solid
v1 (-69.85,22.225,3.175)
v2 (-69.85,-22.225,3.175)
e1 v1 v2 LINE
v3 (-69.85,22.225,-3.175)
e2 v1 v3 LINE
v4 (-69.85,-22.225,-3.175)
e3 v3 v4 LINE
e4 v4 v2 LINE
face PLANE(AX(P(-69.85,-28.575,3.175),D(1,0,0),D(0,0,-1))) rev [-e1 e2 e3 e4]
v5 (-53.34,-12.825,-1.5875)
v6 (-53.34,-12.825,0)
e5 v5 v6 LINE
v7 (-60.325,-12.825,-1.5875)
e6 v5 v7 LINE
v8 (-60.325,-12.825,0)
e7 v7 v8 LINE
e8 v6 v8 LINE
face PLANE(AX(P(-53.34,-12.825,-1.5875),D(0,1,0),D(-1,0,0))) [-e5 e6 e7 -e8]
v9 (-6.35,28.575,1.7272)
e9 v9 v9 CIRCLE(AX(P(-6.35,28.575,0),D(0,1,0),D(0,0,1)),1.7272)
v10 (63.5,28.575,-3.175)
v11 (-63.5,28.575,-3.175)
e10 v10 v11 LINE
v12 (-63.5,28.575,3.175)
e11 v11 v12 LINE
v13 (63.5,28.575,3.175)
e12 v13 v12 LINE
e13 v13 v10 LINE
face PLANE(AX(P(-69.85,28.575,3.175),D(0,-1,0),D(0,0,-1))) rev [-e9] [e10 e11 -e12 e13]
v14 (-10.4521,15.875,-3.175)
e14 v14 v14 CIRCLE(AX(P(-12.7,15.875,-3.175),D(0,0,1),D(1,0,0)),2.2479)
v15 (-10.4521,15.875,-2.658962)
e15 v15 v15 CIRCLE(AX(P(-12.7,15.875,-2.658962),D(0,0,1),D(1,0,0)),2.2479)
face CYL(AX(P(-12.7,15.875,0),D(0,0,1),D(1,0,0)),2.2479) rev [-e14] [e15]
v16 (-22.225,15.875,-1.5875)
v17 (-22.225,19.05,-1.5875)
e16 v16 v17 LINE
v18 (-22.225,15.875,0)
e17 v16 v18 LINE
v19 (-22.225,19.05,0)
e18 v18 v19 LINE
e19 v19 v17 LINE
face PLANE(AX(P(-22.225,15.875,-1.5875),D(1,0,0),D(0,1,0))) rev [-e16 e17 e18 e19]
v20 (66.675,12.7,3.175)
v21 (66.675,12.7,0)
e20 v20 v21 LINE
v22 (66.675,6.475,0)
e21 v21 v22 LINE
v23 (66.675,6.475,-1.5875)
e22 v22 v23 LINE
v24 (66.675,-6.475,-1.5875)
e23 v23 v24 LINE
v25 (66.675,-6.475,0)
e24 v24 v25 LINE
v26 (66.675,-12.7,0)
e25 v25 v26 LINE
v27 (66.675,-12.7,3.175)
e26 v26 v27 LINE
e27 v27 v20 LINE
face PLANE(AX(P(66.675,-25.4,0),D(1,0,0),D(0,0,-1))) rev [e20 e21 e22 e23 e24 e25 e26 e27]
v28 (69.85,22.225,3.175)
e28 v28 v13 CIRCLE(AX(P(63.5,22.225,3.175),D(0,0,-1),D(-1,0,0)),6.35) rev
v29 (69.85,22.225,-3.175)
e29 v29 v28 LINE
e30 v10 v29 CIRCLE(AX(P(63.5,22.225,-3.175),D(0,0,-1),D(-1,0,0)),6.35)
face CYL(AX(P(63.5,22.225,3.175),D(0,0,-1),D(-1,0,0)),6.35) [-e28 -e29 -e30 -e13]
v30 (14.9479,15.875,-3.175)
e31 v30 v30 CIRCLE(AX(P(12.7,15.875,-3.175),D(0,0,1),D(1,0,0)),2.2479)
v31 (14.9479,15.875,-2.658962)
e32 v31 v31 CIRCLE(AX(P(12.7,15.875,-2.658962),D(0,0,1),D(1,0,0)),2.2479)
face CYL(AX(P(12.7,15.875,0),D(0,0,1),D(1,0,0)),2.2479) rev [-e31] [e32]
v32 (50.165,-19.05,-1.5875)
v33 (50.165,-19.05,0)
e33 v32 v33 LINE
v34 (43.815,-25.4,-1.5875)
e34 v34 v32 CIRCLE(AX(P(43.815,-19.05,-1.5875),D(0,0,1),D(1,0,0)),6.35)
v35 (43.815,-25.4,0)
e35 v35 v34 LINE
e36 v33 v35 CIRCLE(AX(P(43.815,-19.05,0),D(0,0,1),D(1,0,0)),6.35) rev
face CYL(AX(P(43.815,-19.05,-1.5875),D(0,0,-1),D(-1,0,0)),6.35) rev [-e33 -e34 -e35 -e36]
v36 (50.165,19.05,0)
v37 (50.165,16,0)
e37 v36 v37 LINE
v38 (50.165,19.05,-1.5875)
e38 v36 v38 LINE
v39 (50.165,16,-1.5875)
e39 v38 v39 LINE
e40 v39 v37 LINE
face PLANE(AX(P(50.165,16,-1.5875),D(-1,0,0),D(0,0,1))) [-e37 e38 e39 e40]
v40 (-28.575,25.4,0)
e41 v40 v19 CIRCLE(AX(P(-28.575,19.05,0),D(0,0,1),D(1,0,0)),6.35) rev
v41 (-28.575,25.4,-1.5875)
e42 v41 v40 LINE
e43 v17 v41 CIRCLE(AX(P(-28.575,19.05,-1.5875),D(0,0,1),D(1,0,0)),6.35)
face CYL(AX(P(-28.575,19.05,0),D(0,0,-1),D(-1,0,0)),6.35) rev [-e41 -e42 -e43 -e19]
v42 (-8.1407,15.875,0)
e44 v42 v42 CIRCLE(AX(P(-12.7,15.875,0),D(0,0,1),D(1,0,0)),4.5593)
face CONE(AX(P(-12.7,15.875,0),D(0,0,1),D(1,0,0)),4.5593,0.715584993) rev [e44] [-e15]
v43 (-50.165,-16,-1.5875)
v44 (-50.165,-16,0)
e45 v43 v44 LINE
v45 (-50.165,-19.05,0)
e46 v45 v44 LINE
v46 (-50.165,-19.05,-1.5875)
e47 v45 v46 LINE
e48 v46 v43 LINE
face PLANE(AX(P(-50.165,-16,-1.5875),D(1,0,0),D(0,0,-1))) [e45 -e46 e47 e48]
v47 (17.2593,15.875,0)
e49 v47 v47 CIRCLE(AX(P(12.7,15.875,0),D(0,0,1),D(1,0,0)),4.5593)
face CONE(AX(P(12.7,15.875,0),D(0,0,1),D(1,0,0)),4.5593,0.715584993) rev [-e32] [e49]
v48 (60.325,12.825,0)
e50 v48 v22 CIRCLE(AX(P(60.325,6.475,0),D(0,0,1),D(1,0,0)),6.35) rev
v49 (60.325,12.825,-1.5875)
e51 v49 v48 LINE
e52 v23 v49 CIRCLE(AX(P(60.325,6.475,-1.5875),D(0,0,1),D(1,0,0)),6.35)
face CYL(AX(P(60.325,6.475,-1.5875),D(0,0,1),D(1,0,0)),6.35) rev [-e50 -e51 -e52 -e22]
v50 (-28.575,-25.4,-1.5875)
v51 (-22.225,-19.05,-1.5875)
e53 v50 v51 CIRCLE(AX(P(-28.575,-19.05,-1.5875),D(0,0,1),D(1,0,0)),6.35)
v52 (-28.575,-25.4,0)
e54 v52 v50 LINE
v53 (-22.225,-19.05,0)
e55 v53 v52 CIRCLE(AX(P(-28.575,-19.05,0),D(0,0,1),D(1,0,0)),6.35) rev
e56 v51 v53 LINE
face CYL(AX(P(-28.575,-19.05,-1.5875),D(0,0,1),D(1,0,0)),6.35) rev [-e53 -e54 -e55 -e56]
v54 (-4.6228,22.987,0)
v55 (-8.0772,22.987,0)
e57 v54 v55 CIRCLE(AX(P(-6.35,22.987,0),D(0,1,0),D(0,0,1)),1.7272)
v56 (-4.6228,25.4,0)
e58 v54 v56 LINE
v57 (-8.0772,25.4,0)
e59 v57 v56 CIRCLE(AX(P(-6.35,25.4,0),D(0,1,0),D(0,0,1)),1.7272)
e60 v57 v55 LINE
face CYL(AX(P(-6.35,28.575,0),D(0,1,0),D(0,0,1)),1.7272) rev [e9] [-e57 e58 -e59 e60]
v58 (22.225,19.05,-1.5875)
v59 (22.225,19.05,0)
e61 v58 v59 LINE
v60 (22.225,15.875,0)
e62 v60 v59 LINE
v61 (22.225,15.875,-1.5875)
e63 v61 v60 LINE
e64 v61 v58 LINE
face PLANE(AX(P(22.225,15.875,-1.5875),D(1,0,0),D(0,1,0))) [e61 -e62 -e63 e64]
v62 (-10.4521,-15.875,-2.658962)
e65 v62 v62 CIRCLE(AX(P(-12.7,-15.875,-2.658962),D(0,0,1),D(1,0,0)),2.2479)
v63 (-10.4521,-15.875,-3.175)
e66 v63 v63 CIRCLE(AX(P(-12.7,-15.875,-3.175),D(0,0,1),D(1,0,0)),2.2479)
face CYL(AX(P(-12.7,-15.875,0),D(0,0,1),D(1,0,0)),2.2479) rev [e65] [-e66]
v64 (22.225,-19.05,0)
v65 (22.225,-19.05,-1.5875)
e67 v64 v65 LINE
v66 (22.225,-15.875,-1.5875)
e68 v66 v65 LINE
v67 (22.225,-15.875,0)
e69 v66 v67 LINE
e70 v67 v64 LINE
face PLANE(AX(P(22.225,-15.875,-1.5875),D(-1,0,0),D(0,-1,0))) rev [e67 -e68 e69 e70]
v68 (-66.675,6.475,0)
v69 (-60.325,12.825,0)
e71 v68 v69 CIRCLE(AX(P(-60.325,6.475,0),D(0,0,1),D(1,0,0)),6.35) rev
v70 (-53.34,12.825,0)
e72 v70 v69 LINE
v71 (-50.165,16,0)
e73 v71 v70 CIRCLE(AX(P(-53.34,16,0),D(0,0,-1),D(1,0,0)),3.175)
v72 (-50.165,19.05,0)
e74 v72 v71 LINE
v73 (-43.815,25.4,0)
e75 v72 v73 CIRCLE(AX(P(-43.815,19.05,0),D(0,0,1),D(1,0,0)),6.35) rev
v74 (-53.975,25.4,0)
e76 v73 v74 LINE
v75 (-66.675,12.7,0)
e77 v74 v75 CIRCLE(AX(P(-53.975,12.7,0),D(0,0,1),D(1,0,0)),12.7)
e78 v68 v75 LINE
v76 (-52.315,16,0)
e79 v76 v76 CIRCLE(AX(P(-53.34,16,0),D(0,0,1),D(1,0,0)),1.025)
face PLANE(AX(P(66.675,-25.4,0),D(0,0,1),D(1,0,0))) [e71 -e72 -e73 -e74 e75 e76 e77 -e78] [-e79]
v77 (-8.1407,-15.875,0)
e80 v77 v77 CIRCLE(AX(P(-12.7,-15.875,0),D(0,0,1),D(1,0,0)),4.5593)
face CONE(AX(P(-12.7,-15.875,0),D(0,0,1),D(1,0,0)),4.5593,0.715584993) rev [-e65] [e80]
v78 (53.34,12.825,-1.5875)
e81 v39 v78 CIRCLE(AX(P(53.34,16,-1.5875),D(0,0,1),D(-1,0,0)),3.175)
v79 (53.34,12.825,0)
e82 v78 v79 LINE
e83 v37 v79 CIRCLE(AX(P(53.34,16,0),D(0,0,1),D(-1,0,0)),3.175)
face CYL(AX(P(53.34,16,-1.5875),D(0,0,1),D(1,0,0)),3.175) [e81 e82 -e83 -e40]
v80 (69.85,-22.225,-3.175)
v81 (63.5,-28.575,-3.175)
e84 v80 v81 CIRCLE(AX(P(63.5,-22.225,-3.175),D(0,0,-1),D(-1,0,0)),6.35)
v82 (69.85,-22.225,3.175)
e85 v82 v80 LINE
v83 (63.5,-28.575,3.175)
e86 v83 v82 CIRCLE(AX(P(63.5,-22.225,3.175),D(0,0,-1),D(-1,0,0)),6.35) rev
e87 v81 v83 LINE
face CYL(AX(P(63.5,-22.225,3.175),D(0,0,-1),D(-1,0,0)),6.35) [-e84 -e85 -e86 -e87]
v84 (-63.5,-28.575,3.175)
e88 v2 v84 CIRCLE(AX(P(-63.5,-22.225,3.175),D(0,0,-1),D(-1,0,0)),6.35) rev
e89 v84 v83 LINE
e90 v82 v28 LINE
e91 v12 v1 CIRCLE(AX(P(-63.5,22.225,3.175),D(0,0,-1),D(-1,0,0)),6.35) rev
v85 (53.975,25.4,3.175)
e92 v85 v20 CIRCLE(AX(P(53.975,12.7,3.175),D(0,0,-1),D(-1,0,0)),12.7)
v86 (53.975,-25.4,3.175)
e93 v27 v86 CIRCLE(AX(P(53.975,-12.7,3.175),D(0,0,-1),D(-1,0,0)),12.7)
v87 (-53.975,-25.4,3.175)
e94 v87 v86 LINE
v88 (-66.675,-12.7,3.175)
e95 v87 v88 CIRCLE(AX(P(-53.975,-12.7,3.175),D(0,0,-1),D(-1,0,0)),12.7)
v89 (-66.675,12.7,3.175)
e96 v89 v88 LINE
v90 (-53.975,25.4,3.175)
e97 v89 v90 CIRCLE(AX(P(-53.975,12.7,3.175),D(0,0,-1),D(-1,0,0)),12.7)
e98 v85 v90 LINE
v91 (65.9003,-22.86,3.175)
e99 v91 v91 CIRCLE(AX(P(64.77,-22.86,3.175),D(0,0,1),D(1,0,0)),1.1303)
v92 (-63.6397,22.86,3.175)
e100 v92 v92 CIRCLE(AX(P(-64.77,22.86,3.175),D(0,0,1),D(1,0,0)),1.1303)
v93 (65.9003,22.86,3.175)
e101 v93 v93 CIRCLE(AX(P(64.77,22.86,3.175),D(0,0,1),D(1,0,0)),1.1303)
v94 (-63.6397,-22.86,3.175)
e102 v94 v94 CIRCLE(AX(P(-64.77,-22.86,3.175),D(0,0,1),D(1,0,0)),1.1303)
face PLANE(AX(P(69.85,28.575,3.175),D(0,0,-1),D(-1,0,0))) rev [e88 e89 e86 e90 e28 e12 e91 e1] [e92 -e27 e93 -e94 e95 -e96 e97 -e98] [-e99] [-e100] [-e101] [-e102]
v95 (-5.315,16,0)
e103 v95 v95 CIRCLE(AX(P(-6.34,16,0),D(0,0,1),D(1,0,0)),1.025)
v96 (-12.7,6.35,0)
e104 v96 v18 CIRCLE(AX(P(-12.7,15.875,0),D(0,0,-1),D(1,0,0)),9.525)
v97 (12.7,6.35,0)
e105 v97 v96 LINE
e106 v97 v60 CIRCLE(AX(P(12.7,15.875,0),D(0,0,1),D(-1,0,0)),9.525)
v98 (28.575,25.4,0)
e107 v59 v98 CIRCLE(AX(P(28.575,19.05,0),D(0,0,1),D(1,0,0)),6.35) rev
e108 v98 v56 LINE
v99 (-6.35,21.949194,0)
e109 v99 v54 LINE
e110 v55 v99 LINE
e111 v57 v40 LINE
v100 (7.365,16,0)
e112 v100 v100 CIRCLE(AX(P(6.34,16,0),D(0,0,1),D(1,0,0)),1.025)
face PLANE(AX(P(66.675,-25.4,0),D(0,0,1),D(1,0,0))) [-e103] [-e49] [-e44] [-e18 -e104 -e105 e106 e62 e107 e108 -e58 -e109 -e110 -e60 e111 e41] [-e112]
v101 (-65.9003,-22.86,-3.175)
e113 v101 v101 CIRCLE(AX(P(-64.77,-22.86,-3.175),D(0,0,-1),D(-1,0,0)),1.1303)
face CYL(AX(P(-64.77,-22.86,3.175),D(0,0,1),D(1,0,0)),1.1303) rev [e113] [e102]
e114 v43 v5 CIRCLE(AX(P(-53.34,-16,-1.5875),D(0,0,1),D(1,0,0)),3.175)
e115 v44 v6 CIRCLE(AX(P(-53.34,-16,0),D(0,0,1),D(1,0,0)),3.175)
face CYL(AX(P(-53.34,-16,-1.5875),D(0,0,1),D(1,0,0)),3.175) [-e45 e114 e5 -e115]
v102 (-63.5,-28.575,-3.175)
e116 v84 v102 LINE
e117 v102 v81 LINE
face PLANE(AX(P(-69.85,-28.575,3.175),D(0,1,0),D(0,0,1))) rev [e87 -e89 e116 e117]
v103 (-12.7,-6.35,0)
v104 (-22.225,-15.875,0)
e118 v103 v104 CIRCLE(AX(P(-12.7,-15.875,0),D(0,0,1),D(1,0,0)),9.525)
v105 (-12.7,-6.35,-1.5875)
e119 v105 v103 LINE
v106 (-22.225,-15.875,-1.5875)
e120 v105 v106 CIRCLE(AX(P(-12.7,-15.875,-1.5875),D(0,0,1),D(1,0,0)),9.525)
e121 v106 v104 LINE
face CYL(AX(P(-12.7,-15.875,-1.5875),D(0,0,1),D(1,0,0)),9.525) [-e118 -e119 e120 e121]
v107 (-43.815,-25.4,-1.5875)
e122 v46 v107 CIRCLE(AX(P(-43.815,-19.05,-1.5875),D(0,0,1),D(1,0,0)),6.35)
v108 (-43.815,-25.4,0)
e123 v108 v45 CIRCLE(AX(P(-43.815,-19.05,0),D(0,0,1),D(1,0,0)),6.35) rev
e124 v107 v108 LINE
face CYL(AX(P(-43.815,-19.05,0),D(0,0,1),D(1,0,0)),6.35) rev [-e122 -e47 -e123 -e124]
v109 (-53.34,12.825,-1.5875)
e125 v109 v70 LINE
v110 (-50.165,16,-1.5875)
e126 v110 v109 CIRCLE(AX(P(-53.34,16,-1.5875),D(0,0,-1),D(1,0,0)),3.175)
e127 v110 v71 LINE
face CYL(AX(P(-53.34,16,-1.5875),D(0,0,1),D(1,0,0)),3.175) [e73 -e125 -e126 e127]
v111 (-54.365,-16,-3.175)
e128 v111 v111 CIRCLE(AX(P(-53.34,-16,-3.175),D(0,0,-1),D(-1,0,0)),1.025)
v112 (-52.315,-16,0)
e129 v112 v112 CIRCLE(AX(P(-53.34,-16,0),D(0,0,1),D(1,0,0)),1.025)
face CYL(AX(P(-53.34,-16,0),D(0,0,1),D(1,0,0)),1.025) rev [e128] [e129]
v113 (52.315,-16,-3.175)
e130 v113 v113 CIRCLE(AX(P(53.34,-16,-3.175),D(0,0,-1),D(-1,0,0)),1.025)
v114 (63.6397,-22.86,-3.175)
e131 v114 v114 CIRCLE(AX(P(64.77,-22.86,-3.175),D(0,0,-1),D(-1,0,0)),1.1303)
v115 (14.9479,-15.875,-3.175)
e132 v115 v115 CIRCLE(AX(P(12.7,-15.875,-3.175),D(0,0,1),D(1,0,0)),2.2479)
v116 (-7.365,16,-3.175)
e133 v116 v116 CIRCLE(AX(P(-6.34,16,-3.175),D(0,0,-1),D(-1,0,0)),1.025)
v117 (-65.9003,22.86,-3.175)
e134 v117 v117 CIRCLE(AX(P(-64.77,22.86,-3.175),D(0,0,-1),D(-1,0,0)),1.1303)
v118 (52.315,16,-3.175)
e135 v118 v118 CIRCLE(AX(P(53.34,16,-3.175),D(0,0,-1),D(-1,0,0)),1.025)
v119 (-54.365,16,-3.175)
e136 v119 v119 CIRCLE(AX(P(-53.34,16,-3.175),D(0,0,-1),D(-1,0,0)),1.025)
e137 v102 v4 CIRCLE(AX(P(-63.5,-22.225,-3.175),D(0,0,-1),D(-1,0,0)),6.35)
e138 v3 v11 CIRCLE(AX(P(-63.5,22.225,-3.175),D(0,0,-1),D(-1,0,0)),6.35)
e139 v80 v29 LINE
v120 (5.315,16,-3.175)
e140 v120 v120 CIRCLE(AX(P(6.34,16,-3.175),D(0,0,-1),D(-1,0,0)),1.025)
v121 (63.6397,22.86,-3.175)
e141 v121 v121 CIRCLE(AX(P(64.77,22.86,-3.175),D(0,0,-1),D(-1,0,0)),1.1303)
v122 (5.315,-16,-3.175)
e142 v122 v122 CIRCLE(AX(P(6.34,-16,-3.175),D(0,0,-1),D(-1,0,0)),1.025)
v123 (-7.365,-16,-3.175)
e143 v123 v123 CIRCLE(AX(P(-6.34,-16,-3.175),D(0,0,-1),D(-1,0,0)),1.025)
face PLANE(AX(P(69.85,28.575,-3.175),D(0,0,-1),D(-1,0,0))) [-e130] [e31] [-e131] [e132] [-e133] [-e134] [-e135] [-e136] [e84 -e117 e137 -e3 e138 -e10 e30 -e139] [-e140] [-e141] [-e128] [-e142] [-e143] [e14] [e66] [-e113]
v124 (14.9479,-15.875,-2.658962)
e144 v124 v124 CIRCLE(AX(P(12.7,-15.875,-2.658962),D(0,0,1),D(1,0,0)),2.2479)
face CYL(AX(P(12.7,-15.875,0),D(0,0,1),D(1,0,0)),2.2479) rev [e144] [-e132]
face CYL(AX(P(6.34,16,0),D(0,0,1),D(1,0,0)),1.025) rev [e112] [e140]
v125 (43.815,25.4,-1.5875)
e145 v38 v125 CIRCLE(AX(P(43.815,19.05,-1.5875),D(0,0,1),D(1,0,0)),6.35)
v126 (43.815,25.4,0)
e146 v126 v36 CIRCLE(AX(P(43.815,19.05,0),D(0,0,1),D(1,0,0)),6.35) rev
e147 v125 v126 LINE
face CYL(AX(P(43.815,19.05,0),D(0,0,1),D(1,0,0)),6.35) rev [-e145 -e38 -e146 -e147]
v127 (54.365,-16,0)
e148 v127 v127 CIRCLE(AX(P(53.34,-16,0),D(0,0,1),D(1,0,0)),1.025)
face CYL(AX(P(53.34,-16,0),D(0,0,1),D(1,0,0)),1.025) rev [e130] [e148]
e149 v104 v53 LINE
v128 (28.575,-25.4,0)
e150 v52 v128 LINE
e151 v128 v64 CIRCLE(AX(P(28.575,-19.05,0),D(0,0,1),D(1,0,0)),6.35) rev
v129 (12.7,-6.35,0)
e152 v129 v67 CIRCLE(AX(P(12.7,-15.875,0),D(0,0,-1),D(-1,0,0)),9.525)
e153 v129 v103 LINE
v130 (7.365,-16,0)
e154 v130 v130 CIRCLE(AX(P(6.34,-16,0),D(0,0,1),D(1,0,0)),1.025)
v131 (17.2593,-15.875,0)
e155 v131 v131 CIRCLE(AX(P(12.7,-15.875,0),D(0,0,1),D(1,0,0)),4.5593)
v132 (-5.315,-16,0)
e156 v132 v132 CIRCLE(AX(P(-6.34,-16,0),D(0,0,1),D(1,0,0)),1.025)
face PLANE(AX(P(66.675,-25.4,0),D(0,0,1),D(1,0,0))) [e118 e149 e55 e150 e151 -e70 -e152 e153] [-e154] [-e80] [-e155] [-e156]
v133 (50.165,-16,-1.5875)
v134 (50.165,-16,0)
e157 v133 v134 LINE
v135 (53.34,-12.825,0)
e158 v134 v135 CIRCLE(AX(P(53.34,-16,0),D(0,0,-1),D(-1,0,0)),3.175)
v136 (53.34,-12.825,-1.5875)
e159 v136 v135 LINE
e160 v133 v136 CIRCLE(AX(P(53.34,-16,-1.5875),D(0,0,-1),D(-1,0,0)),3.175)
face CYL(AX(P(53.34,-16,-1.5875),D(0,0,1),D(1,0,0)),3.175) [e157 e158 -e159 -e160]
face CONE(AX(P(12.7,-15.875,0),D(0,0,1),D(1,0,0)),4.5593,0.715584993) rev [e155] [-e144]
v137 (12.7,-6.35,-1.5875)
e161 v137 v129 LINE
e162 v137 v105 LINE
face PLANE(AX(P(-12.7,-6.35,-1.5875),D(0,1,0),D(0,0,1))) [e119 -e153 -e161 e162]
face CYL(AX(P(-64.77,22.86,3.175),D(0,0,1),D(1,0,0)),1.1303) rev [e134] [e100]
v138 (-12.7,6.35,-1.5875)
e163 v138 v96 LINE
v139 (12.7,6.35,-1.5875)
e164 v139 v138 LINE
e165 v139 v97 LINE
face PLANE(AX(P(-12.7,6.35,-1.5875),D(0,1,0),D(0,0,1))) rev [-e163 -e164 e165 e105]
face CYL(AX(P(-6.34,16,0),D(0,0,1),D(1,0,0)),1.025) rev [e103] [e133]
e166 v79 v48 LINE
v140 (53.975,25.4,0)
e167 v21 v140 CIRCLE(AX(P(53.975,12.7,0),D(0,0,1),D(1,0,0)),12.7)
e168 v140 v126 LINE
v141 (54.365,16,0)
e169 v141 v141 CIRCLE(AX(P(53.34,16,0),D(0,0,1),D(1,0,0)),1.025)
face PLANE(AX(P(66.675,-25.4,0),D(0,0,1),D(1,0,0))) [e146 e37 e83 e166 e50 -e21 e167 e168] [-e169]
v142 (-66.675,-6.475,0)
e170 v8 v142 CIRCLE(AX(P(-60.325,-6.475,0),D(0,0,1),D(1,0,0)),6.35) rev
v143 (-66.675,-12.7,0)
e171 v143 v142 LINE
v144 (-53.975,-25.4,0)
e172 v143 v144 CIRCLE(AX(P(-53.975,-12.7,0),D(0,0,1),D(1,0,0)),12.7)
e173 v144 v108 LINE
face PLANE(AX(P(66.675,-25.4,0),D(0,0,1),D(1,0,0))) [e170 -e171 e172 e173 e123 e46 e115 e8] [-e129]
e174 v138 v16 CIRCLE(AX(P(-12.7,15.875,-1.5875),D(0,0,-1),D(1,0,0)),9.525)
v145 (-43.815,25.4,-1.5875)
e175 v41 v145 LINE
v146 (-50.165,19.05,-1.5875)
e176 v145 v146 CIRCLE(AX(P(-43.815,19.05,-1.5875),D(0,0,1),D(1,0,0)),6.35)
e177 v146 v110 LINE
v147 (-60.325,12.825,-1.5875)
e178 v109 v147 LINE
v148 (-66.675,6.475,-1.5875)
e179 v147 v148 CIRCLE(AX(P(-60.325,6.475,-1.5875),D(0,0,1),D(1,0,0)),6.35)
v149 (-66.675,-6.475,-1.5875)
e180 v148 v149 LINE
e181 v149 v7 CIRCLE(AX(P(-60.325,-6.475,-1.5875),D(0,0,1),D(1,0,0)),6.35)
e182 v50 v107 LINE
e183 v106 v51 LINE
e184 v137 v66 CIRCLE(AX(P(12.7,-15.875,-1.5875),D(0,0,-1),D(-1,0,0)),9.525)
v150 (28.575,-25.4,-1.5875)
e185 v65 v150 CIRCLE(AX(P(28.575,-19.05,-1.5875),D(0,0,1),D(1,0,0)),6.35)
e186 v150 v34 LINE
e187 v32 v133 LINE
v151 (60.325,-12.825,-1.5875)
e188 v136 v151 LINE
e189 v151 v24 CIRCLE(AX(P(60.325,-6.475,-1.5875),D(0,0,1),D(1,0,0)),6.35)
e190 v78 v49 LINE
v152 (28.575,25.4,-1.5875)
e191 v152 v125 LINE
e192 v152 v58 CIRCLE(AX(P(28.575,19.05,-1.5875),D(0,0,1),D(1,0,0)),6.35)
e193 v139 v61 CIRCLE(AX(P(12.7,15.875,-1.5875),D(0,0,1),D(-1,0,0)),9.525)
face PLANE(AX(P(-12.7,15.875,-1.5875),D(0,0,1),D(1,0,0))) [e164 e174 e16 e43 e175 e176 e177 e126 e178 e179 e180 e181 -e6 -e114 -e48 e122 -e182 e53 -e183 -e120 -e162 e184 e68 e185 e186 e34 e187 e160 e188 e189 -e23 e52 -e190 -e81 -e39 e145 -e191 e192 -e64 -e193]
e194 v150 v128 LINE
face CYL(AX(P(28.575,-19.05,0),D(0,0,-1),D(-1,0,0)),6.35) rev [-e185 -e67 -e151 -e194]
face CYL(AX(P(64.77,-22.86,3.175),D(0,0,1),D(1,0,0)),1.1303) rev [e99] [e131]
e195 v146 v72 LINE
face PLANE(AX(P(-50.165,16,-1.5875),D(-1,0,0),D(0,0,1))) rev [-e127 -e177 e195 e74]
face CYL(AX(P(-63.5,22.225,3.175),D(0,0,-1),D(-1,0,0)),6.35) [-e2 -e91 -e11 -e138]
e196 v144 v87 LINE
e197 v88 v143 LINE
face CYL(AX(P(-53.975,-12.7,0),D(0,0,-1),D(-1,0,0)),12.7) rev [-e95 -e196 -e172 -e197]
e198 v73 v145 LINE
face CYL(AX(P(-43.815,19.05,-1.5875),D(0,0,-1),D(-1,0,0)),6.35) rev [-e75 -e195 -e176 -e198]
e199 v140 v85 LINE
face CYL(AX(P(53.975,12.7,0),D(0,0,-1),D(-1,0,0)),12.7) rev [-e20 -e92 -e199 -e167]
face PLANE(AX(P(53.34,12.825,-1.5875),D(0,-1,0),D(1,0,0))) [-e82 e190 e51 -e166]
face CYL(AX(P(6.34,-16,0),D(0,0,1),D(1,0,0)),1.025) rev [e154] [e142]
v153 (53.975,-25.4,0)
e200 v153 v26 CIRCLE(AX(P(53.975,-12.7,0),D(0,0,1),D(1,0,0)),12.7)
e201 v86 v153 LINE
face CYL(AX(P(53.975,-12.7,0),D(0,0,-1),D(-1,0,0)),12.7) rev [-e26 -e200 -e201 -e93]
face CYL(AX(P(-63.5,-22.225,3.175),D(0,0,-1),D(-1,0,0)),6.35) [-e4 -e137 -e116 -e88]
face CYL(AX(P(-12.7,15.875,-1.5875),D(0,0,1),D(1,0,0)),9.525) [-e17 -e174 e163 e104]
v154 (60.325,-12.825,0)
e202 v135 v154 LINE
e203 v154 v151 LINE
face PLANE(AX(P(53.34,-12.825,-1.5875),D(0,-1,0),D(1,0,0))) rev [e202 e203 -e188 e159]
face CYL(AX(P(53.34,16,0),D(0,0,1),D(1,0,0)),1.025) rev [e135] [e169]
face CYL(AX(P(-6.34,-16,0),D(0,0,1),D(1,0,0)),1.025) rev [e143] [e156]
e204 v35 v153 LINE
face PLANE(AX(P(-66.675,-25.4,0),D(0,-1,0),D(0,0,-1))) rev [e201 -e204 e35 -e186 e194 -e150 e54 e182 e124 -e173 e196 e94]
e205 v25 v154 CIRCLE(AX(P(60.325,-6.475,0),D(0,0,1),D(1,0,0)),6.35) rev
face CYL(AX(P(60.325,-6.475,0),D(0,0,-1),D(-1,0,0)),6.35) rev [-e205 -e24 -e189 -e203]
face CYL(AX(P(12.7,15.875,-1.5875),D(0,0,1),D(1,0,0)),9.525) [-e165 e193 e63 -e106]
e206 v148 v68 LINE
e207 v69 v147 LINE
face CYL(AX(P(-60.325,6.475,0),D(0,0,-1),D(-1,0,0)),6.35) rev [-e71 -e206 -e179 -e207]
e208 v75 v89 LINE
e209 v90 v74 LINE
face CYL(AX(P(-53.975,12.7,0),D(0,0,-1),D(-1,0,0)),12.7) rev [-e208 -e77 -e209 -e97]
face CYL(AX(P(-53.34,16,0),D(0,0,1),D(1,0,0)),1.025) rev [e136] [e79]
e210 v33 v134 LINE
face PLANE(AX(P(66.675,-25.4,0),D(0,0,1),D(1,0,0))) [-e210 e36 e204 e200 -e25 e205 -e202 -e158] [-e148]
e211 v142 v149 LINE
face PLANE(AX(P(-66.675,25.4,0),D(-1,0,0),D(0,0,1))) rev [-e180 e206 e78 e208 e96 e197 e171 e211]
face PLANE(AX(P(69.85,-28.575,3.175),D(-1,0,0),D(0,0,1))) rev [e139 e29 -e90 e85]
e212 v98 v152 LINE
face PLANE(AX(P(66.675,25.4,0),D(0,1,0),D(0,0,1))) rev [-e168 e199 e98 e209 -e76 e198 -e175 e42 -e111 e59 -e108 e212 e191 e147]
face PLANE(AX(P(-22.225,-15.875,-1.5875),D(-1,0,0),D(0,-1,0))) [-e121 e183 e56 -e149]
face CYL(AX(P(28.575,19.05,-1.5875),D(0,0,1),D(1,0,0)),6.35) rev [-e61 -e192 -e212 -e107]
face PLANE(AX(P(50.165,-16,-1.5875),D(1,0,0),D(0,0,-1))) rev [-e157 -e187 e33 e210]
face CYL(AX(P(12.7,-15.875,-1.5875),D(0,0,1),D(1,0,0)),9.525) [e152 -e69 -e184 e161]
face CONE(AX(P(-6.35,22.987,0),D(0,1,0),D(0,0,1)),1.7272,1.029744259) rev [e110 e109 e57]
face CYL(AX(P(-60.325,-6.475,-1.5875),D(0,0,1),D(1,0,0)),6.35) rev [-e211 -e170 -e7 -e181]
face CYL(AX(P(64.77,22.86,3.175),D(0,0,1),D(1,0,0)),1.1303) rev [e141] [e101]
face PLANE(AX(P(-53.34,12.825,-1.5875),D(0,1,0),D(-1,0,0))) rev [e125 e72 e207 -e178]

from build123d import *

# Parameters (mm, degrees)
SKETCH1_W                                     = 139.7
SKETCH1_H                                     = 57.15
BOSS_EXTRUDE1_DEPTH                           = 3.175
SKETCH2_W                                     = 133.35
SKETCH2_H                                     = 50.8
CUT_EXTRUDE1_DEPTH                            = 3.175
FILLET1_R                                     = 12.7
FILLET2_R                                     = 6.35
M2_5X0_45_TAPPED_HOLE1_D                      = 2.05
CSK_FOR_8_FLAT_HEAD_SOCKET_CAP_SCREW1_A_COUNT = 2
CSK_FOR_8_FLAT_HEAD_SOCKET_CAP_SCREW1_A_PITCH = 25.4
CSK_FOR_8_FLAT_HEAD_SOCKET_CAP_SCRE_2_COUNT   = 2
CSK_FOR_8_FLAT_HEAD_SOCKET_CAP_SCRE_2_PITCH   = 31.75
CSK_FOR_8_FLAT_HEAD_SOCKET_CAP_SCRE_3_COUNT   = 2
CSK_FOR_8_FLAT_HEAD_SOCKET_CAP_SCRE_3_PITCH   = 40.659838908
F_4_40_TAPPED_HOLE1_D                         = 2.2606
F_4_40_TAPPED_HOLE1_DEPTH                     = 7.62
F_4_40_TAPPED_HOLE1_TIP                       = 0.679152758
CUT_EXTRUDE2_START                            = -1.5875
CUT_EXTRUDE2_DEPTH                            = 1.5875
MIRROR2_START                                 = -1.5875
MIRROR2_COPY_1_DEPTH                          = 1.5875
FILLET3_R                                     = 6.35
F_8_32_TAPPED_HOLE1_D                         = 3.4544
F_8_32_TAPPED_HOLE1_DEPTH                     = 5.588
F_8_32_TAPPED_HOLE1_TIP                       = 1.037806461


with BuildPart() as part:
    # Sketch1 → Boss-Extrude1 (new, symmetric)
    with BuildSketch(Plane.XY):
        Rectangle(SKETCH1_W, SKETCH1_H)
    extrude(amount=BOSS_EXTRUDE1_DEPTH, both=True)

    # Sketch2 → Cut-Extrude1 (cut)
    with BuildSketch(Plane.XY.offset(3.175)):
        Rectangle(SKETCH2_W, SKETCH2_H)
    extrude(amount=-CUT_EXTRUDE1_DEPTH, mode=Mode.SUBTRACT)

    # Fillet1
    fillet1_edges = [part.edges().sort_by_distance(p)[0] for p in [
        (66.675, -25.4, 1.5875),
        (-66.675, -25.4, 1.5875),
        (-66.675, 25.4, 1.5875),
        (66.675, 25.4, 1.5875),
    ]]
    fillet(fillet1_edges, radius=FILLET1_R)

    # Fillet2
    fillet2_edges = [part.edges().sort_by_distance(p)[0] for p in [
        (69.85, -28.575, 0),
        (-69.85, -28.575, 0),
        (-69.85, 28.575, 0),
        (69.85, 28.575, 0),
    ]]
    fillet(fillet2_edges, radius=FILLET2_R)

    # M2.5x0.45 Tapped Hole1 (through all)
    with Locations(Plane.XY):
        with Locations((-53.34, -16), (-53.34, 16), (-6.34, 16), (-6.34, -16), (6.34, 16), (6.34, -16), (53.34, 16), (53.34, -16)):
            Hole(M2_5X0_45_TAPPED_HOLE1_D / 2)

    # Sketch10 → CSK for #8 Flat Head Socket Cap Screw1 (revolve, cut)
    with BuildSketch(Plane(origin=(-12.7, 15.875, 0), x_dir=(0, -1, 0), z_dir=(1, 0, 0))):
        Polygon((0, 0), (0, 3.175), (2.2479, 3.175), (2.2479, 2.658961536), (4.5593, 0), align=None)
    csk_for_8_flat_head_socket_cap_screw1 = revolve(axis=Axis((-12.7, 15.875, 6.35), (0, 0, -1)), mode=Mode.SUBTRACT)

    # CSK for #8 Flat Head Socket Cap Screw1 a: CSK for #8 Flat Head Socket Cap Screw1 ×2
    with Locations(*[(i * CSK_FOR_8_FLAT_HEAD_SOCKET_CAP_SCREW1_A_PITCH, 0, 0) for i in range(1, CSK_FOR_8_FLAT_HEAD_SOCKET_CAP_SCREW1_A_COUNT)]):
        add(csk_for_8_flat_head_socket_cap_screw1, mode=Mode.SUBTRACT)

    # CSK for _8 Flat Head Socket Cap Scre 2: CSK for #8 Flat Head Socket Cap Screw1 ×2
    with Locations(*[(0, -i * CSK_FOR_8_FLAT_HEAD_SOCKET_CAP_SCRE_2_PITCH, 0) for i in range(1, CSK_FOR_8_FLAT_HEAD_SOCKET_CAP_SCRE_2_COUNT)]):
        add(csk_for_8_flat_head_socket_cap_screw1, mode=Mode.SUBTRACT)

    # CSK for _8 Flat Head Socket Cap Scre 3: CSK for #8 Flat Head Socket Cap Screw1 ×2
    with Locations(*[Vector(0.6246950475544243, -0.7808688094430304, 0) * (i * CSK_FOR_8_FLAT_HEAD_SOCKET_CAP_SCRE_3_PITCH) for i in range(1, CSK_FOR_8_FLAT_HEAD_SOCKET_CAP_SCRE_3_COUNT)]):
        add(csk_for_8_flat_head_socket_cap_screw1, mode=Mode.SUBTRACT)

    # #4-40 Tapped Hole1
    with Locations(Plane.XY.offset(3.175)):
        with Locations((-64.77, 22.86), (-64.77, -22.86), (64.77, 22.86), (64.77, -22.86)):
            Hole(F_4_40_TAPPED_HOLE1_D / 2, depth=F_4_40_TAPPED_HOLE1_DEPTH)
            with Locations((0, 0, -(F_4_40_TAPPED_HOLE1_DEPTH + F_4_40_TAPPED_HOLE1_TIP / 2))):  # 118° drill point
                Cone(0, F_4_40_TAPPED_HOLE1_D / 2, F_4_40_TAPPED_HOLE1_TIP, mode=Mode.SUBTRACT)

    # Sketch14 → Cut-Extrude2 (cut)
    with BuildSketch(Plane.XY.offset(CUT_EXTRUDE2_START)):
        with BuildLine():
            Line((-22.225, 15.875), (-22.225, 25.4))
            Line((-22.225, 25.4), (-50.165, 25.4))
            Line((-50.165, 25.4), (-50.165, 16))
            ThreePointArc((-50.165, 16), (-51.09493597, 13.75493597), (-53.34, 12.825))
            Line((-53.34, 12.825), (-66.674384828, 12.825))
            ThreePointArc((-66.674384828, 12.825), (-66.674846206, 12.762500757), (-66.675, 12.7))
            Line((-66.675, 12.7), (-66.675, 0))
            Line((-66.675, 0), (0, 0))
            Line((0, 0), (0, 6.35))
            Line((0, 6.35), (-12.7, 6.35))
            ThreePointArc((-12.7, 6.35), (-19.435192091, 9.139807909), (-22.225, 15.875))
        make_face()
    cut_extrude2 = extrude(amount=CUT_EXTRUDE2_DEPTH, mode=Mode.SUBTRACT)

    # Mirror1: Cut-Extrude2 across plane
    add(cut_extrude2.mirror(Plane.ZX), mode=Mode.SUBTRACT)

    # Mirror2: Cut-Extrude2 across plane
    add(cut_extrude2.mirror(Plane(origin=(0, 0, 0), x_dir=(0, 0, 1), z_dir=(1, 0, 0))), mode=Mode.SUBTRACT)

    # Mirror2 copy 1 sketch → Mirror2 copy 1 (cut)
    with BuildSketch(Plane(origin=(0, 0, 0), x_dir=(-1, 0, 0), z_dir=(0, 0, 1)).offset(MIRROR2_START)):
        with BuildLine():
            Line((-22.225, 15.875), (-22.225, 25.4))
            Line((-22.225, 25.4), (-50.165, 25.4))
            Line((-50.165, 25.4), (-50.165, 16))
            ThreePointArc((-50.165, 16), (-51.09493597, 13.75493597), (-53.34, 12.825))
            Line((-53.34, 12.825), (-66.674384828, 12.825))
            ThreePointArc((-66.674384828, 12.825), (-66.674846206, 12.762500757), (-66.675, 12.7))
            Line((-66.675, 12.7), (-66.675, 0))
            Line((-66.675, 0), (0, 0))
            Line((0, 0), (0, 6.35))
            Line((0, 6.35), (-12.7, 6.35))
            ThreePointArc((-12.7, 6.35), (-19.435192091, 9.139807909), (-22.225, 15.875))
        make_face()
    extrude(amount=MIRROR2_COPY_1_DEPTH, mode=Mode.SUBTRACT)

    # Fillet3
    # the kernel refuses this fillet: 6.35 mm, written as the material it adds along each edge
    with BuildSketch(Plane(origin=(50.165, -25.4, -1.5875), x_dir=(0, 1, 0), z_dir=(0, 0, 1)), Plane(origin=(22.225, 25.4, -1.5875), x_dir=(0, -1, 0), z_dir=(0, 0, 1)), Plane(origin=(-22.225, -25.4, -1.5875), x_dir=(0, 1, 0), z_dir=(0, 0, 1)), Plane(origin=(-50.165, 25.4, -1.5875), x_dir=(0, -1, 0), z_dir=(0, 0, 1))) as fillet3_piece_1:
        with BuildLine():
            CenterArc((FILLET3_R, FILLET3_R), FILLET3_R, 180, 90)
            Line((0, FILLET3_R), (0, 0))
            Line((0, 0), (FILLET3_R, 0))
        make_face()
    extrude(amount=1.5875)
    with BuildSketch(Plane(origin=(66.674384828, -12.825, -1.5875), x_dir=(-1, 0, 0), z_dir=(0, 0, 1)), Plane(origin=(-66.674384828, 12.825, -1.5875), x_dir=(1, 0, 0), z_dir=(0, 0, 1))) as fillet3_piece_2:
        with BuildLine():
            CenterArc((6.349384828, -6.35), FILLET3_R, 90, 90)
            Line((-0.000615172, -6.35), (-0.635615172, -6.35))
            ThreePointArc((-0.635615172, -6.35), (-0.635615172, -0.125), (-0.634969241, 0.00625))
            Line((-0.634969241, 0.00625), (0, 0.635))
            Line((0, 0.635), (6.349384828, 0.635))
            Line((6.349384828, 0.635), (6.349384828, 0))
        make_face()
    extrude(amount=1.5875)
    with BuildSketch(Plane(origin=(66.674384828, 12.825, -1.5875), x_dir=(-1, 0, 0), z_dir=(0, 0, 1)), Plane(origin=(-66.674384828, -12.825, -1.5875), x_dir=(1, 0, 0), z_dir=(0, 0, 1))) as fillet3_piece_3:
        with BuildLine():
            CenterArc((6.349384828, 6.35), FILLET3_R, 180, 90)
            Line((-0.000615172, 6.35), (-0.635615172, 6.35))
            ThreePointArc((-0.635615172, 6.35), (-0.635615172, 0.125), (-0.634969241, -0.00625))
            Line((-0.634969241, -0.00625), (0, -0.635))
            Line((0, -0.635), (6.349384828, -0.635))
            Line((6.349384828, -0.635), (6.349384828, 0))
        make_face()
    extrude(amount=1.5875)
    with BuildSketch(Plane(origin=(50.165, 25.4, -1.5875), x_dir=(0, -1, 0), z_dir=(0, 0, 1)), Plane(origin=(22.225, -25.4, -1.5875), x_dir=(0, 1, 0), z_dir=(0, 0, 1)), Plane(origin=(-50.165, -25.4, -1.5875), x_dir=(0, 1, 0), z_dir=(0, 0, 1)), Plane(origin=(-22.225, 25.4, -1.5875), x_dir=(0, -1, 0), z_dir=(0, 0, 1))) as fillet3_piece_4:
        with BuildLine():
            CenterArc((FILLET3_R, -FILLET3_R), FILLET3_R, 90, 90)
            Line((0, -FILLET3_R), (0, 0))
            Line((0, 0), (FILLET3_R, 0))
        make_face()
    extrude(amount=1.5875)

    # #8-32 Tapped Hole1
    with Locations(Plane(origin=(0, 28.575, 0), x_dir=(-1, 0, 0), z_dir=(0, 1, 0))):
        with Locations((6.35, 0)):
            Hole(F_8_32_TAPPED_HOLE1_D / 2, depth=F_8_32_TAPPED_HOLE1_DEPTH)
            with Locations((0, 0, -(F_8_32_TAPPED_HOLE1_DEPTH + F_8_32_TAPPED_HOLE1_TIP / 2))):  # 118° drill point
                Cone(0, F_8_32_TAPPED_HOLE1_D / 2, F_8_32_TAPPED_HOLE1_TIP, mode=Mode.SUBTRACT)


solid = part.part
